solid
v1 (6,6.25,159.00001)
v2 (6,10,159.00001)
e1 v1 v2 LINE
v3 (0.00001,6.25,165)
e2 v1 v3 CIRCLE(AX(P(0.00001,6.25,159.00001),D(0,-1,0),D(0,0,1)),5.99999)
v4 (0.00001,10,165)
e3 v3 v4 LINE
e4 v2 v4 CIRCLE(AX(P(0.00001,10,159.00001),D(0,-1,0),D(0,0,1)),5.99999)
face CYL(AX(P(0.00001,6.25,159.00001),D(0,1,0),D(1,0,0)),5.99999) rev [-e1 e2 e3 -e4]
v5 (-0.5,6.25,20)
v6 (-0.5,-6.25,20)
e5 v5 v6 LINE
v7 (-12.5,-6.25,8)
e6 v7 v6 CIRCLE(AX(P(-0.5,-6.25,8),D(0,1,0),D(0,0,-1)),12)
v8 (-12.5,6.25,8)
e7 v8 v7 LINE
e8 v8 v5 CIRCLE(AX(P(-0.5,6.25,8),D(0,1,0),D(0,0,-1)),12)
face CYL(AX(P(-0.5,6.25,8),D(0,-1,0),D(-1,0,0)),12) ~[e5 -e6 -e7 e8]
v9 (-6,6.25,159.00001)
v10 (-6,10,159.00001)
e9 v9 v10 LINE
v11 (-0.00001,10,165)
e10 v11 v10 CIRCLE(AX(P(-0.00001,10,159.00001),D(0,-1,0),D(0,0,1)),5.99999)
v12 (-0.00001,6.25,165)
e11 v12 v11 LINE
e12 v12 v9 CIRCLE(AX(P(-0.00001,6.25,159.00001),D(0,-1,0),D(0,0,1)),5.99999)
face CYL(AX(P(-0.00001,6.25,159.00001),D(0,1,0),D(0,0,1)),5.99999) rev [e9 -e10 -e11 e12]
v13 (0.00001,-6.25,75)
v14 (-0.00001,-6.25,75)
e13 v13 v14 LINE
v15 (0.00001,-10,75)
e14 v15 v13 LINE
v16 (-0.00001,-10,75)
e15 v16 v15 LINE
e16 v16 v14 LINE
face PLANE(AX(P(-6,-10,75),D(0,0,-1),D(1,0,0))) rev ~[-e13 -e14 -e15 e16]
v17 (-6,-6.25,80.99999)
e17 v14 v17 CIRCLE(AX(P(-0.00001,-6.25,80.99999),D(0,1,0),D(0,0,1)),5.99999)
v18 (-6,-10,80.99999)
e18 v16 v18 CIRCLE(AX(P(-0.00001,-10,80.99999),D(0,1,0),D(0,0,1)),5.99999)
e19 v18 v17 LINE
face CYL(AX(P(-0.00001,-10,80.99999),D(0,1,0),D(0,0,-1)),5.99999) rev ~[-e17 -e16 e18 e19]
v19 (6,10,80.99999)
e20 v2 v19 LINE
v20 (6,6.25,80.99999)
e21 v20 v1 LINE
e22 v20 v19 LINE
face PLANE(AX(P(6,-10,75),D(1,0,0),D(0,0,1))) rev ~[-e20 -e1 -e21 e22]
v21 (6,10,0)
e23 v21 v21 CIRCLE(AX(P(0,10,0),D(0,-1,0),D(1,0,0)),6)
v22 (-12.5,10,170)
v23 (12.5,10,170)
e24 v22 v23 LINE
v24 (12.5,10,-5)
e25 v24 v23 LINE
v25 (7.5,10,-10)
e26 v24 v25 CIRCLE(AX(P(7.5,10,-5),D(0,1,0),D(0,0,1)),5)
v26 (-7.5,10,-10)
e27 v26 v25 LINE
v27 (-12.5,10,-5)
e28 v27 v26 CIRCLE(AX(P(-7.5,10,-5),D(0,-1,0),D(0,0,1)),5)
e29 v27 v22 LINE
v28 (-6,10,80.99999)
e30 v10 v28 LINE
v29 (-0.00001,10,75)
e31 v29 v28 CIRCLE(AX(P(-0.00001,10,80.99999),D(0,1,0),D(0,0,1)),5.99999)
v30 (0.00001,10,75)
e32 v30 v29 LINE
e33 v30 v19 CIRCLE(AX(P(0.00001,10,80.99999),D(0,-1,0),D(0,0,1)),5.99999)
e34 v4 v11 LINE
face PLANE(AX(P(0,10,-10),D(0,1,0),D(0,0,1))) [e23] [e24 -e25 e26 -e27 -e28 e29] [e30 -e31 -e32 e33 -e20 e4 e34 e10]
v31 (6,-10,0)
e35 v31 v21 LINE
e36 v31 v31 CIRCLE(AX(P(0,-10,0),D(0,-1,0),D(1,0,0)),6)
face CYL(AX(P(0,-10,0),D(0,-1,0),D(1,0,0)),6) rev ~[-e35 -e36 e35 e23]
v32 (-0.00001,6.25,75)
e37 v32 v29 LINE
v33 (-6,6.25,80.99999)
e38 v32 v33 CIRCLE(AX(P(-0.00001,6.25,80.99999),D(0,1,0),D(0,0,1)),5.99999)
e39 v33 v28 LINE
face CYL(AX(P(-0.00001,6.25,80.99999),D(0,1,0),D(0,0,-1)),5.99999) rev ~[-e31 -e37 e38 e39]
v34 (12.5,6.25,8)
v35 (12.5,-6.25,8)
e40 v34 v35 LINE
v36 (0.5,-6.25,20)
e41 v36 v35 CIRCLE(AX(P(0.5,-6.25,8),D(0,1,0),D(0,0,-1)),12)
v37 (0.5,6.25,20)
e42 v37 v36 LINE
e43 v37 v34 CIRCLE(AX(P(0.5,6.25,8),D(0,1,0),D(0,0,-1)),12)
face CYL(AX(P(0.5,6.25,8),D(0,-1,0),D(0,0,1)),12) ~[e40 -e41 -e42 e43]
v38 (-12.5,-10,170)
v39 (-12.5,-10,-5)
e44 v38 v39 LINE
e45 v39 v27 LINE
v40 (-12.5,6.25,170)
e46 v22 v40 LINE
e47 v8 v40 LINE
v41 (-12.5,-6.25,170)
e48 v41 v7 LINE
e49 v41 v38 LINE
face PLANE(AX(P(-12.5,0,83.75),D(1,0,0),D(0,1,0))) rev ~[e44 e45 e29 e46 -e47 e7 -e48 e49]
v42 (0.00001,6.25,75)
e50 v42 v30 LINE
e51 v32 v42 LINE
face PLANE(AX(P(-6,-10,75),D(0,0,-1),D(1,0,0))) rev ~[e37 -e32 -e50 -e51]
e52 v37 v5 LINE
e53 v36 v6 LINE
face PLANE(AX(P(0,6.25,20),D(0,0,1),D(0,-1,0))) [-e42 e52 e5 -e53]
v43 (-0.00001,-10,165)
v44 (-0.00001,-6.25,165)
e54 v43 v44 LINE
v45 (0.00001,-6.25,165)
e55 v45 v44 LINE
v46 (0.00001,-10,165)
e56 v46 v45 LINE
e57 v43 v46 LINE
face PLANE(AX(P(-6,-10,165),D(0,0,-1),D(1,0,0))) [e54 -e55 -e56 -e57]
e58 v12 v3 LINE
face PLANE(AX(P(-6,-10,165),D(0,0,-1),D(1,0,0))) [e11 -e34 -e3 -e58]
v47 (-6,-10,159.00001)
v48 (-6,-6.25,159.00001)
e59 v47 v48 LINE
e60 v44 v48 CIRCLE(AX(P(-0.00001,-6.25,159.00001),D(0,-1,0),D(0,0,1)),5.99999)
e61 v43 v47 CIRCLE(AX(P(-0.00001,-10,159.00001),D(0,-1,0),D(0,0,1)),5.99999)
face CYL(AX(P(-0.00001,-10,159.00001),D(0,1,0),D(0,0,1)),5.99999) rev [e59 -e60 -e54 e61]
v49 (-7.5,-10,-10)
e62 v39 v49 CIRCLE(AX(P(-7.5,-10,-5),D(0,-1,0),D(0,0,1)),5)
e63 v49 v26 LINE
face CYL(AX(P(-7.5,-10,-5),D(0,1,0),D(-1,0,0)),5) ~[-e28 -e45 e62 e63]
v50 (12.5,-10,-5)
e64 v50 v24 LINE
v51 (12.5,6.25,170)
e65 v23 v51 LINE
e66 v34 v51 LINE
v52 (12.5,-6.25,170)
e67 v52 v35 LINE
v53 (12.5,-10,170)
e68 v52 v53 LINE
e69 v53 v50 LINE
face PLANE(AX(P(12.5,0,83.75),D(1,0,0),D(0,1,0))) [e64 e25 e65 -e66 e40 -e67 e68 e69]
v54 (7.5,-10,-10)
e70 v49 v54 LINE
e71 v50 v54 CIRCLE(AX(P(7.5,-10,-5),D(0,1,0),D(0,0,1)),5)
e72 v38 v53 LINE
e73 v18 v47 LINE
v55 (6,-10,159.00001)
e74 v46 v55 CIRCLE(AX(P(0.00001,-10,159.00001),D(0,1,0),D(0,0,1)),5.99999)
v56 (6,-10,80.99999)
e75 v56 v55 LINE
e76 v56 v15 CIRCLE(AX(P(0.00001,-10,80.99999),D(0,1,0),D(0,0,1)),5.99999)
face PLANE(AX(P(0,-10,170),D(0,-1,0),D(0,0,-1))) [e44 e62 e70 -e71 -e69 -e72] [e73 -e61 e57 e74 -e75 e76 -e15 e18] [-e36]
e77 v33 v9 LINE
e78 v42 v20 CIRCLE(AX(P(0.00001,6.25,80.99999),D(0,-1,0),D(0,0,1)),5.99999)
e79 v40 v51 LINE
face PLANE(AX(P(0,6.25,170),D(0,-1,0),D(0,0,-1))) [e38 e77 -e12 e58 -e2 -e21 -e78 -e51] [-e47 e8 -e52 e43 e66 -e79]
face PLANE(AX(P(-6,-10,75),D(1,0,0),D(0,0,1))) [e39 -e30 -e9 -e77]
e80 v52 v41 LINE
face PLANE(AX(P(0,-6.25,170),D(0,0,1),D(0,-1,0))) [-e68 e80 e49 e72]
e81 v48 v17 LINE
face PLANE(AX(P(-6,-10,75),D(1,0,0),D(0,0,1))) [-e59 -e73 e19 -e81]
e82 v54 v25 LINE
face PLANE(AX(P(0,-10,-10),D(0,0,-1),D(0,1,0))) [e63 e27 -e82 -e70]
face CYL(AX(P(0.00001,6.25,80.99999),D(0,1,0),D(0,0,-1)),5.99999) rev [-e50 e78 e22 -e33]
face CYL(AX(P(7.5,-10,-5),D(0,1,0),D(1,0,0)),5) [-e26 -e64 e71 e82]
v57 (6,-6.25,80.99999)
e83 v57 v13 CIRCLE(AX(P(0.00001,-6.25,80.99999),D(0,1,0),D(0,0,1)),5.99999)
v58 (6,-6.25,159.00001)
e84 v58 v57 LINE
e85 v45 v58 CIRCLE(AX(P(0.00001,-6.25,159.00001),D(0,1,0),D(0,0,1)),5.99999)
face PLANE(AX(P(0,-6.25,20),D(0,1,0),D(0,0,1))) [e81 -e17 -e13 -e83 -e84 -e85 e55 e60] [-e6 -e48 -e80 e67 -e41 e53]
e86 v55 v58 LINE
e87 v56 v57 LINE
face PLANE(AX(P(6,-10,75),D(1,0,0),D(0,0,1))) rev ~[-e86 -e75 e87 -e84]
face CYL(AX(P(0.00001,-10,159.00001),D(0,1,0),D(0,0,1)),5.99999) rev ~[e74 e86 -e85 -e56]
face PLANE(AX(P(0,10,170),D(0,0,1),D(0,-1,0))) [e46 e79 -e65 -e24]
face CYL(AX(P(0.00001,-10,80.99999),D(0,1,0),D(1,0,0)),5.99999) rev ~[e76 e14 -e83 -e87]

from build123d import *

# Parameters (mm, degrees)
F1_DEPTH = 12.5
F2_R     = 6
F3_DEPTH = 20.001
F4_R     = 5
F5_R     = 12
F6_W     = 12
F6_H     = 90
F7_DEPTH = 20.001
F8_R     = 5.99999


# Not quite as in the source:
# - a fillet or chamfer is up to 0.001 mm smaller than in the source, because OpenCascade refuses the exact size


with BuildPart() as f1:
    # F0 (on Right) → F1 (new body, symmetric)
    with BuildSketch(Plane.YZ):
        Polygon((-6.25, 170), (-10, 170), (-10, -10), (10, -10), (10, 170), (6.25, 170), (6.25, 20), (-6.25, 20), align=None)
    extrude(amount=F1_DEPTH, both=True)

    # F2 (on face) → F3 (cut, through all)
    with BuildSketch(Plane.XZ.offset(10)):
        Circle(F2_R)
    extrude(amount=-F3_DEPTH, mode=Mode.SUBTRACT)

    # F4
    f4_edges = [f1.edges().sort_by_distance(p)[0] for p in [
        (12.5, 0, -10),
        (-12.5, 0, -10),
    ]]
    fillet(f4_edges, radius=F4_R)

    # F5
    f5_edges = [f1.edges().sort_by_distance(p)[0] for p in [
        (12.5, 0, 20),
        (-12.5, 0, 20),
    ]]
    fillet(f5_edges, radius=F5_R)

    # F6 (on face) → F7 (cut, through all)
    with BuildSketch(Plane.XZ.offset(10)):
        with Locations((0, 120)):
            Rectangle(F6_W, F6_H)
    extrude(amount=-F7_DEPTH, mode=Mode.SUBTRACT)

    # F8 (radius 6 in the source; OpenCascade refuses exactly that, so slightly less here)
    f8_edges = [f1.edges().sort_by_distance(p)[0] for p in [
        (-6, -8.125, 165),
        (6, -8.125, 165),
        (6, -8.125, 75),
        (-6, -8.125, 75),
        (-6, 8.125, 75),
        (6, 8.125, 75),
        (6, 8.125, 165),
        (-6, 8.125, 165),
    ]]
    fillet(f8_edges, radius=F8_R)


solid = f1.part
